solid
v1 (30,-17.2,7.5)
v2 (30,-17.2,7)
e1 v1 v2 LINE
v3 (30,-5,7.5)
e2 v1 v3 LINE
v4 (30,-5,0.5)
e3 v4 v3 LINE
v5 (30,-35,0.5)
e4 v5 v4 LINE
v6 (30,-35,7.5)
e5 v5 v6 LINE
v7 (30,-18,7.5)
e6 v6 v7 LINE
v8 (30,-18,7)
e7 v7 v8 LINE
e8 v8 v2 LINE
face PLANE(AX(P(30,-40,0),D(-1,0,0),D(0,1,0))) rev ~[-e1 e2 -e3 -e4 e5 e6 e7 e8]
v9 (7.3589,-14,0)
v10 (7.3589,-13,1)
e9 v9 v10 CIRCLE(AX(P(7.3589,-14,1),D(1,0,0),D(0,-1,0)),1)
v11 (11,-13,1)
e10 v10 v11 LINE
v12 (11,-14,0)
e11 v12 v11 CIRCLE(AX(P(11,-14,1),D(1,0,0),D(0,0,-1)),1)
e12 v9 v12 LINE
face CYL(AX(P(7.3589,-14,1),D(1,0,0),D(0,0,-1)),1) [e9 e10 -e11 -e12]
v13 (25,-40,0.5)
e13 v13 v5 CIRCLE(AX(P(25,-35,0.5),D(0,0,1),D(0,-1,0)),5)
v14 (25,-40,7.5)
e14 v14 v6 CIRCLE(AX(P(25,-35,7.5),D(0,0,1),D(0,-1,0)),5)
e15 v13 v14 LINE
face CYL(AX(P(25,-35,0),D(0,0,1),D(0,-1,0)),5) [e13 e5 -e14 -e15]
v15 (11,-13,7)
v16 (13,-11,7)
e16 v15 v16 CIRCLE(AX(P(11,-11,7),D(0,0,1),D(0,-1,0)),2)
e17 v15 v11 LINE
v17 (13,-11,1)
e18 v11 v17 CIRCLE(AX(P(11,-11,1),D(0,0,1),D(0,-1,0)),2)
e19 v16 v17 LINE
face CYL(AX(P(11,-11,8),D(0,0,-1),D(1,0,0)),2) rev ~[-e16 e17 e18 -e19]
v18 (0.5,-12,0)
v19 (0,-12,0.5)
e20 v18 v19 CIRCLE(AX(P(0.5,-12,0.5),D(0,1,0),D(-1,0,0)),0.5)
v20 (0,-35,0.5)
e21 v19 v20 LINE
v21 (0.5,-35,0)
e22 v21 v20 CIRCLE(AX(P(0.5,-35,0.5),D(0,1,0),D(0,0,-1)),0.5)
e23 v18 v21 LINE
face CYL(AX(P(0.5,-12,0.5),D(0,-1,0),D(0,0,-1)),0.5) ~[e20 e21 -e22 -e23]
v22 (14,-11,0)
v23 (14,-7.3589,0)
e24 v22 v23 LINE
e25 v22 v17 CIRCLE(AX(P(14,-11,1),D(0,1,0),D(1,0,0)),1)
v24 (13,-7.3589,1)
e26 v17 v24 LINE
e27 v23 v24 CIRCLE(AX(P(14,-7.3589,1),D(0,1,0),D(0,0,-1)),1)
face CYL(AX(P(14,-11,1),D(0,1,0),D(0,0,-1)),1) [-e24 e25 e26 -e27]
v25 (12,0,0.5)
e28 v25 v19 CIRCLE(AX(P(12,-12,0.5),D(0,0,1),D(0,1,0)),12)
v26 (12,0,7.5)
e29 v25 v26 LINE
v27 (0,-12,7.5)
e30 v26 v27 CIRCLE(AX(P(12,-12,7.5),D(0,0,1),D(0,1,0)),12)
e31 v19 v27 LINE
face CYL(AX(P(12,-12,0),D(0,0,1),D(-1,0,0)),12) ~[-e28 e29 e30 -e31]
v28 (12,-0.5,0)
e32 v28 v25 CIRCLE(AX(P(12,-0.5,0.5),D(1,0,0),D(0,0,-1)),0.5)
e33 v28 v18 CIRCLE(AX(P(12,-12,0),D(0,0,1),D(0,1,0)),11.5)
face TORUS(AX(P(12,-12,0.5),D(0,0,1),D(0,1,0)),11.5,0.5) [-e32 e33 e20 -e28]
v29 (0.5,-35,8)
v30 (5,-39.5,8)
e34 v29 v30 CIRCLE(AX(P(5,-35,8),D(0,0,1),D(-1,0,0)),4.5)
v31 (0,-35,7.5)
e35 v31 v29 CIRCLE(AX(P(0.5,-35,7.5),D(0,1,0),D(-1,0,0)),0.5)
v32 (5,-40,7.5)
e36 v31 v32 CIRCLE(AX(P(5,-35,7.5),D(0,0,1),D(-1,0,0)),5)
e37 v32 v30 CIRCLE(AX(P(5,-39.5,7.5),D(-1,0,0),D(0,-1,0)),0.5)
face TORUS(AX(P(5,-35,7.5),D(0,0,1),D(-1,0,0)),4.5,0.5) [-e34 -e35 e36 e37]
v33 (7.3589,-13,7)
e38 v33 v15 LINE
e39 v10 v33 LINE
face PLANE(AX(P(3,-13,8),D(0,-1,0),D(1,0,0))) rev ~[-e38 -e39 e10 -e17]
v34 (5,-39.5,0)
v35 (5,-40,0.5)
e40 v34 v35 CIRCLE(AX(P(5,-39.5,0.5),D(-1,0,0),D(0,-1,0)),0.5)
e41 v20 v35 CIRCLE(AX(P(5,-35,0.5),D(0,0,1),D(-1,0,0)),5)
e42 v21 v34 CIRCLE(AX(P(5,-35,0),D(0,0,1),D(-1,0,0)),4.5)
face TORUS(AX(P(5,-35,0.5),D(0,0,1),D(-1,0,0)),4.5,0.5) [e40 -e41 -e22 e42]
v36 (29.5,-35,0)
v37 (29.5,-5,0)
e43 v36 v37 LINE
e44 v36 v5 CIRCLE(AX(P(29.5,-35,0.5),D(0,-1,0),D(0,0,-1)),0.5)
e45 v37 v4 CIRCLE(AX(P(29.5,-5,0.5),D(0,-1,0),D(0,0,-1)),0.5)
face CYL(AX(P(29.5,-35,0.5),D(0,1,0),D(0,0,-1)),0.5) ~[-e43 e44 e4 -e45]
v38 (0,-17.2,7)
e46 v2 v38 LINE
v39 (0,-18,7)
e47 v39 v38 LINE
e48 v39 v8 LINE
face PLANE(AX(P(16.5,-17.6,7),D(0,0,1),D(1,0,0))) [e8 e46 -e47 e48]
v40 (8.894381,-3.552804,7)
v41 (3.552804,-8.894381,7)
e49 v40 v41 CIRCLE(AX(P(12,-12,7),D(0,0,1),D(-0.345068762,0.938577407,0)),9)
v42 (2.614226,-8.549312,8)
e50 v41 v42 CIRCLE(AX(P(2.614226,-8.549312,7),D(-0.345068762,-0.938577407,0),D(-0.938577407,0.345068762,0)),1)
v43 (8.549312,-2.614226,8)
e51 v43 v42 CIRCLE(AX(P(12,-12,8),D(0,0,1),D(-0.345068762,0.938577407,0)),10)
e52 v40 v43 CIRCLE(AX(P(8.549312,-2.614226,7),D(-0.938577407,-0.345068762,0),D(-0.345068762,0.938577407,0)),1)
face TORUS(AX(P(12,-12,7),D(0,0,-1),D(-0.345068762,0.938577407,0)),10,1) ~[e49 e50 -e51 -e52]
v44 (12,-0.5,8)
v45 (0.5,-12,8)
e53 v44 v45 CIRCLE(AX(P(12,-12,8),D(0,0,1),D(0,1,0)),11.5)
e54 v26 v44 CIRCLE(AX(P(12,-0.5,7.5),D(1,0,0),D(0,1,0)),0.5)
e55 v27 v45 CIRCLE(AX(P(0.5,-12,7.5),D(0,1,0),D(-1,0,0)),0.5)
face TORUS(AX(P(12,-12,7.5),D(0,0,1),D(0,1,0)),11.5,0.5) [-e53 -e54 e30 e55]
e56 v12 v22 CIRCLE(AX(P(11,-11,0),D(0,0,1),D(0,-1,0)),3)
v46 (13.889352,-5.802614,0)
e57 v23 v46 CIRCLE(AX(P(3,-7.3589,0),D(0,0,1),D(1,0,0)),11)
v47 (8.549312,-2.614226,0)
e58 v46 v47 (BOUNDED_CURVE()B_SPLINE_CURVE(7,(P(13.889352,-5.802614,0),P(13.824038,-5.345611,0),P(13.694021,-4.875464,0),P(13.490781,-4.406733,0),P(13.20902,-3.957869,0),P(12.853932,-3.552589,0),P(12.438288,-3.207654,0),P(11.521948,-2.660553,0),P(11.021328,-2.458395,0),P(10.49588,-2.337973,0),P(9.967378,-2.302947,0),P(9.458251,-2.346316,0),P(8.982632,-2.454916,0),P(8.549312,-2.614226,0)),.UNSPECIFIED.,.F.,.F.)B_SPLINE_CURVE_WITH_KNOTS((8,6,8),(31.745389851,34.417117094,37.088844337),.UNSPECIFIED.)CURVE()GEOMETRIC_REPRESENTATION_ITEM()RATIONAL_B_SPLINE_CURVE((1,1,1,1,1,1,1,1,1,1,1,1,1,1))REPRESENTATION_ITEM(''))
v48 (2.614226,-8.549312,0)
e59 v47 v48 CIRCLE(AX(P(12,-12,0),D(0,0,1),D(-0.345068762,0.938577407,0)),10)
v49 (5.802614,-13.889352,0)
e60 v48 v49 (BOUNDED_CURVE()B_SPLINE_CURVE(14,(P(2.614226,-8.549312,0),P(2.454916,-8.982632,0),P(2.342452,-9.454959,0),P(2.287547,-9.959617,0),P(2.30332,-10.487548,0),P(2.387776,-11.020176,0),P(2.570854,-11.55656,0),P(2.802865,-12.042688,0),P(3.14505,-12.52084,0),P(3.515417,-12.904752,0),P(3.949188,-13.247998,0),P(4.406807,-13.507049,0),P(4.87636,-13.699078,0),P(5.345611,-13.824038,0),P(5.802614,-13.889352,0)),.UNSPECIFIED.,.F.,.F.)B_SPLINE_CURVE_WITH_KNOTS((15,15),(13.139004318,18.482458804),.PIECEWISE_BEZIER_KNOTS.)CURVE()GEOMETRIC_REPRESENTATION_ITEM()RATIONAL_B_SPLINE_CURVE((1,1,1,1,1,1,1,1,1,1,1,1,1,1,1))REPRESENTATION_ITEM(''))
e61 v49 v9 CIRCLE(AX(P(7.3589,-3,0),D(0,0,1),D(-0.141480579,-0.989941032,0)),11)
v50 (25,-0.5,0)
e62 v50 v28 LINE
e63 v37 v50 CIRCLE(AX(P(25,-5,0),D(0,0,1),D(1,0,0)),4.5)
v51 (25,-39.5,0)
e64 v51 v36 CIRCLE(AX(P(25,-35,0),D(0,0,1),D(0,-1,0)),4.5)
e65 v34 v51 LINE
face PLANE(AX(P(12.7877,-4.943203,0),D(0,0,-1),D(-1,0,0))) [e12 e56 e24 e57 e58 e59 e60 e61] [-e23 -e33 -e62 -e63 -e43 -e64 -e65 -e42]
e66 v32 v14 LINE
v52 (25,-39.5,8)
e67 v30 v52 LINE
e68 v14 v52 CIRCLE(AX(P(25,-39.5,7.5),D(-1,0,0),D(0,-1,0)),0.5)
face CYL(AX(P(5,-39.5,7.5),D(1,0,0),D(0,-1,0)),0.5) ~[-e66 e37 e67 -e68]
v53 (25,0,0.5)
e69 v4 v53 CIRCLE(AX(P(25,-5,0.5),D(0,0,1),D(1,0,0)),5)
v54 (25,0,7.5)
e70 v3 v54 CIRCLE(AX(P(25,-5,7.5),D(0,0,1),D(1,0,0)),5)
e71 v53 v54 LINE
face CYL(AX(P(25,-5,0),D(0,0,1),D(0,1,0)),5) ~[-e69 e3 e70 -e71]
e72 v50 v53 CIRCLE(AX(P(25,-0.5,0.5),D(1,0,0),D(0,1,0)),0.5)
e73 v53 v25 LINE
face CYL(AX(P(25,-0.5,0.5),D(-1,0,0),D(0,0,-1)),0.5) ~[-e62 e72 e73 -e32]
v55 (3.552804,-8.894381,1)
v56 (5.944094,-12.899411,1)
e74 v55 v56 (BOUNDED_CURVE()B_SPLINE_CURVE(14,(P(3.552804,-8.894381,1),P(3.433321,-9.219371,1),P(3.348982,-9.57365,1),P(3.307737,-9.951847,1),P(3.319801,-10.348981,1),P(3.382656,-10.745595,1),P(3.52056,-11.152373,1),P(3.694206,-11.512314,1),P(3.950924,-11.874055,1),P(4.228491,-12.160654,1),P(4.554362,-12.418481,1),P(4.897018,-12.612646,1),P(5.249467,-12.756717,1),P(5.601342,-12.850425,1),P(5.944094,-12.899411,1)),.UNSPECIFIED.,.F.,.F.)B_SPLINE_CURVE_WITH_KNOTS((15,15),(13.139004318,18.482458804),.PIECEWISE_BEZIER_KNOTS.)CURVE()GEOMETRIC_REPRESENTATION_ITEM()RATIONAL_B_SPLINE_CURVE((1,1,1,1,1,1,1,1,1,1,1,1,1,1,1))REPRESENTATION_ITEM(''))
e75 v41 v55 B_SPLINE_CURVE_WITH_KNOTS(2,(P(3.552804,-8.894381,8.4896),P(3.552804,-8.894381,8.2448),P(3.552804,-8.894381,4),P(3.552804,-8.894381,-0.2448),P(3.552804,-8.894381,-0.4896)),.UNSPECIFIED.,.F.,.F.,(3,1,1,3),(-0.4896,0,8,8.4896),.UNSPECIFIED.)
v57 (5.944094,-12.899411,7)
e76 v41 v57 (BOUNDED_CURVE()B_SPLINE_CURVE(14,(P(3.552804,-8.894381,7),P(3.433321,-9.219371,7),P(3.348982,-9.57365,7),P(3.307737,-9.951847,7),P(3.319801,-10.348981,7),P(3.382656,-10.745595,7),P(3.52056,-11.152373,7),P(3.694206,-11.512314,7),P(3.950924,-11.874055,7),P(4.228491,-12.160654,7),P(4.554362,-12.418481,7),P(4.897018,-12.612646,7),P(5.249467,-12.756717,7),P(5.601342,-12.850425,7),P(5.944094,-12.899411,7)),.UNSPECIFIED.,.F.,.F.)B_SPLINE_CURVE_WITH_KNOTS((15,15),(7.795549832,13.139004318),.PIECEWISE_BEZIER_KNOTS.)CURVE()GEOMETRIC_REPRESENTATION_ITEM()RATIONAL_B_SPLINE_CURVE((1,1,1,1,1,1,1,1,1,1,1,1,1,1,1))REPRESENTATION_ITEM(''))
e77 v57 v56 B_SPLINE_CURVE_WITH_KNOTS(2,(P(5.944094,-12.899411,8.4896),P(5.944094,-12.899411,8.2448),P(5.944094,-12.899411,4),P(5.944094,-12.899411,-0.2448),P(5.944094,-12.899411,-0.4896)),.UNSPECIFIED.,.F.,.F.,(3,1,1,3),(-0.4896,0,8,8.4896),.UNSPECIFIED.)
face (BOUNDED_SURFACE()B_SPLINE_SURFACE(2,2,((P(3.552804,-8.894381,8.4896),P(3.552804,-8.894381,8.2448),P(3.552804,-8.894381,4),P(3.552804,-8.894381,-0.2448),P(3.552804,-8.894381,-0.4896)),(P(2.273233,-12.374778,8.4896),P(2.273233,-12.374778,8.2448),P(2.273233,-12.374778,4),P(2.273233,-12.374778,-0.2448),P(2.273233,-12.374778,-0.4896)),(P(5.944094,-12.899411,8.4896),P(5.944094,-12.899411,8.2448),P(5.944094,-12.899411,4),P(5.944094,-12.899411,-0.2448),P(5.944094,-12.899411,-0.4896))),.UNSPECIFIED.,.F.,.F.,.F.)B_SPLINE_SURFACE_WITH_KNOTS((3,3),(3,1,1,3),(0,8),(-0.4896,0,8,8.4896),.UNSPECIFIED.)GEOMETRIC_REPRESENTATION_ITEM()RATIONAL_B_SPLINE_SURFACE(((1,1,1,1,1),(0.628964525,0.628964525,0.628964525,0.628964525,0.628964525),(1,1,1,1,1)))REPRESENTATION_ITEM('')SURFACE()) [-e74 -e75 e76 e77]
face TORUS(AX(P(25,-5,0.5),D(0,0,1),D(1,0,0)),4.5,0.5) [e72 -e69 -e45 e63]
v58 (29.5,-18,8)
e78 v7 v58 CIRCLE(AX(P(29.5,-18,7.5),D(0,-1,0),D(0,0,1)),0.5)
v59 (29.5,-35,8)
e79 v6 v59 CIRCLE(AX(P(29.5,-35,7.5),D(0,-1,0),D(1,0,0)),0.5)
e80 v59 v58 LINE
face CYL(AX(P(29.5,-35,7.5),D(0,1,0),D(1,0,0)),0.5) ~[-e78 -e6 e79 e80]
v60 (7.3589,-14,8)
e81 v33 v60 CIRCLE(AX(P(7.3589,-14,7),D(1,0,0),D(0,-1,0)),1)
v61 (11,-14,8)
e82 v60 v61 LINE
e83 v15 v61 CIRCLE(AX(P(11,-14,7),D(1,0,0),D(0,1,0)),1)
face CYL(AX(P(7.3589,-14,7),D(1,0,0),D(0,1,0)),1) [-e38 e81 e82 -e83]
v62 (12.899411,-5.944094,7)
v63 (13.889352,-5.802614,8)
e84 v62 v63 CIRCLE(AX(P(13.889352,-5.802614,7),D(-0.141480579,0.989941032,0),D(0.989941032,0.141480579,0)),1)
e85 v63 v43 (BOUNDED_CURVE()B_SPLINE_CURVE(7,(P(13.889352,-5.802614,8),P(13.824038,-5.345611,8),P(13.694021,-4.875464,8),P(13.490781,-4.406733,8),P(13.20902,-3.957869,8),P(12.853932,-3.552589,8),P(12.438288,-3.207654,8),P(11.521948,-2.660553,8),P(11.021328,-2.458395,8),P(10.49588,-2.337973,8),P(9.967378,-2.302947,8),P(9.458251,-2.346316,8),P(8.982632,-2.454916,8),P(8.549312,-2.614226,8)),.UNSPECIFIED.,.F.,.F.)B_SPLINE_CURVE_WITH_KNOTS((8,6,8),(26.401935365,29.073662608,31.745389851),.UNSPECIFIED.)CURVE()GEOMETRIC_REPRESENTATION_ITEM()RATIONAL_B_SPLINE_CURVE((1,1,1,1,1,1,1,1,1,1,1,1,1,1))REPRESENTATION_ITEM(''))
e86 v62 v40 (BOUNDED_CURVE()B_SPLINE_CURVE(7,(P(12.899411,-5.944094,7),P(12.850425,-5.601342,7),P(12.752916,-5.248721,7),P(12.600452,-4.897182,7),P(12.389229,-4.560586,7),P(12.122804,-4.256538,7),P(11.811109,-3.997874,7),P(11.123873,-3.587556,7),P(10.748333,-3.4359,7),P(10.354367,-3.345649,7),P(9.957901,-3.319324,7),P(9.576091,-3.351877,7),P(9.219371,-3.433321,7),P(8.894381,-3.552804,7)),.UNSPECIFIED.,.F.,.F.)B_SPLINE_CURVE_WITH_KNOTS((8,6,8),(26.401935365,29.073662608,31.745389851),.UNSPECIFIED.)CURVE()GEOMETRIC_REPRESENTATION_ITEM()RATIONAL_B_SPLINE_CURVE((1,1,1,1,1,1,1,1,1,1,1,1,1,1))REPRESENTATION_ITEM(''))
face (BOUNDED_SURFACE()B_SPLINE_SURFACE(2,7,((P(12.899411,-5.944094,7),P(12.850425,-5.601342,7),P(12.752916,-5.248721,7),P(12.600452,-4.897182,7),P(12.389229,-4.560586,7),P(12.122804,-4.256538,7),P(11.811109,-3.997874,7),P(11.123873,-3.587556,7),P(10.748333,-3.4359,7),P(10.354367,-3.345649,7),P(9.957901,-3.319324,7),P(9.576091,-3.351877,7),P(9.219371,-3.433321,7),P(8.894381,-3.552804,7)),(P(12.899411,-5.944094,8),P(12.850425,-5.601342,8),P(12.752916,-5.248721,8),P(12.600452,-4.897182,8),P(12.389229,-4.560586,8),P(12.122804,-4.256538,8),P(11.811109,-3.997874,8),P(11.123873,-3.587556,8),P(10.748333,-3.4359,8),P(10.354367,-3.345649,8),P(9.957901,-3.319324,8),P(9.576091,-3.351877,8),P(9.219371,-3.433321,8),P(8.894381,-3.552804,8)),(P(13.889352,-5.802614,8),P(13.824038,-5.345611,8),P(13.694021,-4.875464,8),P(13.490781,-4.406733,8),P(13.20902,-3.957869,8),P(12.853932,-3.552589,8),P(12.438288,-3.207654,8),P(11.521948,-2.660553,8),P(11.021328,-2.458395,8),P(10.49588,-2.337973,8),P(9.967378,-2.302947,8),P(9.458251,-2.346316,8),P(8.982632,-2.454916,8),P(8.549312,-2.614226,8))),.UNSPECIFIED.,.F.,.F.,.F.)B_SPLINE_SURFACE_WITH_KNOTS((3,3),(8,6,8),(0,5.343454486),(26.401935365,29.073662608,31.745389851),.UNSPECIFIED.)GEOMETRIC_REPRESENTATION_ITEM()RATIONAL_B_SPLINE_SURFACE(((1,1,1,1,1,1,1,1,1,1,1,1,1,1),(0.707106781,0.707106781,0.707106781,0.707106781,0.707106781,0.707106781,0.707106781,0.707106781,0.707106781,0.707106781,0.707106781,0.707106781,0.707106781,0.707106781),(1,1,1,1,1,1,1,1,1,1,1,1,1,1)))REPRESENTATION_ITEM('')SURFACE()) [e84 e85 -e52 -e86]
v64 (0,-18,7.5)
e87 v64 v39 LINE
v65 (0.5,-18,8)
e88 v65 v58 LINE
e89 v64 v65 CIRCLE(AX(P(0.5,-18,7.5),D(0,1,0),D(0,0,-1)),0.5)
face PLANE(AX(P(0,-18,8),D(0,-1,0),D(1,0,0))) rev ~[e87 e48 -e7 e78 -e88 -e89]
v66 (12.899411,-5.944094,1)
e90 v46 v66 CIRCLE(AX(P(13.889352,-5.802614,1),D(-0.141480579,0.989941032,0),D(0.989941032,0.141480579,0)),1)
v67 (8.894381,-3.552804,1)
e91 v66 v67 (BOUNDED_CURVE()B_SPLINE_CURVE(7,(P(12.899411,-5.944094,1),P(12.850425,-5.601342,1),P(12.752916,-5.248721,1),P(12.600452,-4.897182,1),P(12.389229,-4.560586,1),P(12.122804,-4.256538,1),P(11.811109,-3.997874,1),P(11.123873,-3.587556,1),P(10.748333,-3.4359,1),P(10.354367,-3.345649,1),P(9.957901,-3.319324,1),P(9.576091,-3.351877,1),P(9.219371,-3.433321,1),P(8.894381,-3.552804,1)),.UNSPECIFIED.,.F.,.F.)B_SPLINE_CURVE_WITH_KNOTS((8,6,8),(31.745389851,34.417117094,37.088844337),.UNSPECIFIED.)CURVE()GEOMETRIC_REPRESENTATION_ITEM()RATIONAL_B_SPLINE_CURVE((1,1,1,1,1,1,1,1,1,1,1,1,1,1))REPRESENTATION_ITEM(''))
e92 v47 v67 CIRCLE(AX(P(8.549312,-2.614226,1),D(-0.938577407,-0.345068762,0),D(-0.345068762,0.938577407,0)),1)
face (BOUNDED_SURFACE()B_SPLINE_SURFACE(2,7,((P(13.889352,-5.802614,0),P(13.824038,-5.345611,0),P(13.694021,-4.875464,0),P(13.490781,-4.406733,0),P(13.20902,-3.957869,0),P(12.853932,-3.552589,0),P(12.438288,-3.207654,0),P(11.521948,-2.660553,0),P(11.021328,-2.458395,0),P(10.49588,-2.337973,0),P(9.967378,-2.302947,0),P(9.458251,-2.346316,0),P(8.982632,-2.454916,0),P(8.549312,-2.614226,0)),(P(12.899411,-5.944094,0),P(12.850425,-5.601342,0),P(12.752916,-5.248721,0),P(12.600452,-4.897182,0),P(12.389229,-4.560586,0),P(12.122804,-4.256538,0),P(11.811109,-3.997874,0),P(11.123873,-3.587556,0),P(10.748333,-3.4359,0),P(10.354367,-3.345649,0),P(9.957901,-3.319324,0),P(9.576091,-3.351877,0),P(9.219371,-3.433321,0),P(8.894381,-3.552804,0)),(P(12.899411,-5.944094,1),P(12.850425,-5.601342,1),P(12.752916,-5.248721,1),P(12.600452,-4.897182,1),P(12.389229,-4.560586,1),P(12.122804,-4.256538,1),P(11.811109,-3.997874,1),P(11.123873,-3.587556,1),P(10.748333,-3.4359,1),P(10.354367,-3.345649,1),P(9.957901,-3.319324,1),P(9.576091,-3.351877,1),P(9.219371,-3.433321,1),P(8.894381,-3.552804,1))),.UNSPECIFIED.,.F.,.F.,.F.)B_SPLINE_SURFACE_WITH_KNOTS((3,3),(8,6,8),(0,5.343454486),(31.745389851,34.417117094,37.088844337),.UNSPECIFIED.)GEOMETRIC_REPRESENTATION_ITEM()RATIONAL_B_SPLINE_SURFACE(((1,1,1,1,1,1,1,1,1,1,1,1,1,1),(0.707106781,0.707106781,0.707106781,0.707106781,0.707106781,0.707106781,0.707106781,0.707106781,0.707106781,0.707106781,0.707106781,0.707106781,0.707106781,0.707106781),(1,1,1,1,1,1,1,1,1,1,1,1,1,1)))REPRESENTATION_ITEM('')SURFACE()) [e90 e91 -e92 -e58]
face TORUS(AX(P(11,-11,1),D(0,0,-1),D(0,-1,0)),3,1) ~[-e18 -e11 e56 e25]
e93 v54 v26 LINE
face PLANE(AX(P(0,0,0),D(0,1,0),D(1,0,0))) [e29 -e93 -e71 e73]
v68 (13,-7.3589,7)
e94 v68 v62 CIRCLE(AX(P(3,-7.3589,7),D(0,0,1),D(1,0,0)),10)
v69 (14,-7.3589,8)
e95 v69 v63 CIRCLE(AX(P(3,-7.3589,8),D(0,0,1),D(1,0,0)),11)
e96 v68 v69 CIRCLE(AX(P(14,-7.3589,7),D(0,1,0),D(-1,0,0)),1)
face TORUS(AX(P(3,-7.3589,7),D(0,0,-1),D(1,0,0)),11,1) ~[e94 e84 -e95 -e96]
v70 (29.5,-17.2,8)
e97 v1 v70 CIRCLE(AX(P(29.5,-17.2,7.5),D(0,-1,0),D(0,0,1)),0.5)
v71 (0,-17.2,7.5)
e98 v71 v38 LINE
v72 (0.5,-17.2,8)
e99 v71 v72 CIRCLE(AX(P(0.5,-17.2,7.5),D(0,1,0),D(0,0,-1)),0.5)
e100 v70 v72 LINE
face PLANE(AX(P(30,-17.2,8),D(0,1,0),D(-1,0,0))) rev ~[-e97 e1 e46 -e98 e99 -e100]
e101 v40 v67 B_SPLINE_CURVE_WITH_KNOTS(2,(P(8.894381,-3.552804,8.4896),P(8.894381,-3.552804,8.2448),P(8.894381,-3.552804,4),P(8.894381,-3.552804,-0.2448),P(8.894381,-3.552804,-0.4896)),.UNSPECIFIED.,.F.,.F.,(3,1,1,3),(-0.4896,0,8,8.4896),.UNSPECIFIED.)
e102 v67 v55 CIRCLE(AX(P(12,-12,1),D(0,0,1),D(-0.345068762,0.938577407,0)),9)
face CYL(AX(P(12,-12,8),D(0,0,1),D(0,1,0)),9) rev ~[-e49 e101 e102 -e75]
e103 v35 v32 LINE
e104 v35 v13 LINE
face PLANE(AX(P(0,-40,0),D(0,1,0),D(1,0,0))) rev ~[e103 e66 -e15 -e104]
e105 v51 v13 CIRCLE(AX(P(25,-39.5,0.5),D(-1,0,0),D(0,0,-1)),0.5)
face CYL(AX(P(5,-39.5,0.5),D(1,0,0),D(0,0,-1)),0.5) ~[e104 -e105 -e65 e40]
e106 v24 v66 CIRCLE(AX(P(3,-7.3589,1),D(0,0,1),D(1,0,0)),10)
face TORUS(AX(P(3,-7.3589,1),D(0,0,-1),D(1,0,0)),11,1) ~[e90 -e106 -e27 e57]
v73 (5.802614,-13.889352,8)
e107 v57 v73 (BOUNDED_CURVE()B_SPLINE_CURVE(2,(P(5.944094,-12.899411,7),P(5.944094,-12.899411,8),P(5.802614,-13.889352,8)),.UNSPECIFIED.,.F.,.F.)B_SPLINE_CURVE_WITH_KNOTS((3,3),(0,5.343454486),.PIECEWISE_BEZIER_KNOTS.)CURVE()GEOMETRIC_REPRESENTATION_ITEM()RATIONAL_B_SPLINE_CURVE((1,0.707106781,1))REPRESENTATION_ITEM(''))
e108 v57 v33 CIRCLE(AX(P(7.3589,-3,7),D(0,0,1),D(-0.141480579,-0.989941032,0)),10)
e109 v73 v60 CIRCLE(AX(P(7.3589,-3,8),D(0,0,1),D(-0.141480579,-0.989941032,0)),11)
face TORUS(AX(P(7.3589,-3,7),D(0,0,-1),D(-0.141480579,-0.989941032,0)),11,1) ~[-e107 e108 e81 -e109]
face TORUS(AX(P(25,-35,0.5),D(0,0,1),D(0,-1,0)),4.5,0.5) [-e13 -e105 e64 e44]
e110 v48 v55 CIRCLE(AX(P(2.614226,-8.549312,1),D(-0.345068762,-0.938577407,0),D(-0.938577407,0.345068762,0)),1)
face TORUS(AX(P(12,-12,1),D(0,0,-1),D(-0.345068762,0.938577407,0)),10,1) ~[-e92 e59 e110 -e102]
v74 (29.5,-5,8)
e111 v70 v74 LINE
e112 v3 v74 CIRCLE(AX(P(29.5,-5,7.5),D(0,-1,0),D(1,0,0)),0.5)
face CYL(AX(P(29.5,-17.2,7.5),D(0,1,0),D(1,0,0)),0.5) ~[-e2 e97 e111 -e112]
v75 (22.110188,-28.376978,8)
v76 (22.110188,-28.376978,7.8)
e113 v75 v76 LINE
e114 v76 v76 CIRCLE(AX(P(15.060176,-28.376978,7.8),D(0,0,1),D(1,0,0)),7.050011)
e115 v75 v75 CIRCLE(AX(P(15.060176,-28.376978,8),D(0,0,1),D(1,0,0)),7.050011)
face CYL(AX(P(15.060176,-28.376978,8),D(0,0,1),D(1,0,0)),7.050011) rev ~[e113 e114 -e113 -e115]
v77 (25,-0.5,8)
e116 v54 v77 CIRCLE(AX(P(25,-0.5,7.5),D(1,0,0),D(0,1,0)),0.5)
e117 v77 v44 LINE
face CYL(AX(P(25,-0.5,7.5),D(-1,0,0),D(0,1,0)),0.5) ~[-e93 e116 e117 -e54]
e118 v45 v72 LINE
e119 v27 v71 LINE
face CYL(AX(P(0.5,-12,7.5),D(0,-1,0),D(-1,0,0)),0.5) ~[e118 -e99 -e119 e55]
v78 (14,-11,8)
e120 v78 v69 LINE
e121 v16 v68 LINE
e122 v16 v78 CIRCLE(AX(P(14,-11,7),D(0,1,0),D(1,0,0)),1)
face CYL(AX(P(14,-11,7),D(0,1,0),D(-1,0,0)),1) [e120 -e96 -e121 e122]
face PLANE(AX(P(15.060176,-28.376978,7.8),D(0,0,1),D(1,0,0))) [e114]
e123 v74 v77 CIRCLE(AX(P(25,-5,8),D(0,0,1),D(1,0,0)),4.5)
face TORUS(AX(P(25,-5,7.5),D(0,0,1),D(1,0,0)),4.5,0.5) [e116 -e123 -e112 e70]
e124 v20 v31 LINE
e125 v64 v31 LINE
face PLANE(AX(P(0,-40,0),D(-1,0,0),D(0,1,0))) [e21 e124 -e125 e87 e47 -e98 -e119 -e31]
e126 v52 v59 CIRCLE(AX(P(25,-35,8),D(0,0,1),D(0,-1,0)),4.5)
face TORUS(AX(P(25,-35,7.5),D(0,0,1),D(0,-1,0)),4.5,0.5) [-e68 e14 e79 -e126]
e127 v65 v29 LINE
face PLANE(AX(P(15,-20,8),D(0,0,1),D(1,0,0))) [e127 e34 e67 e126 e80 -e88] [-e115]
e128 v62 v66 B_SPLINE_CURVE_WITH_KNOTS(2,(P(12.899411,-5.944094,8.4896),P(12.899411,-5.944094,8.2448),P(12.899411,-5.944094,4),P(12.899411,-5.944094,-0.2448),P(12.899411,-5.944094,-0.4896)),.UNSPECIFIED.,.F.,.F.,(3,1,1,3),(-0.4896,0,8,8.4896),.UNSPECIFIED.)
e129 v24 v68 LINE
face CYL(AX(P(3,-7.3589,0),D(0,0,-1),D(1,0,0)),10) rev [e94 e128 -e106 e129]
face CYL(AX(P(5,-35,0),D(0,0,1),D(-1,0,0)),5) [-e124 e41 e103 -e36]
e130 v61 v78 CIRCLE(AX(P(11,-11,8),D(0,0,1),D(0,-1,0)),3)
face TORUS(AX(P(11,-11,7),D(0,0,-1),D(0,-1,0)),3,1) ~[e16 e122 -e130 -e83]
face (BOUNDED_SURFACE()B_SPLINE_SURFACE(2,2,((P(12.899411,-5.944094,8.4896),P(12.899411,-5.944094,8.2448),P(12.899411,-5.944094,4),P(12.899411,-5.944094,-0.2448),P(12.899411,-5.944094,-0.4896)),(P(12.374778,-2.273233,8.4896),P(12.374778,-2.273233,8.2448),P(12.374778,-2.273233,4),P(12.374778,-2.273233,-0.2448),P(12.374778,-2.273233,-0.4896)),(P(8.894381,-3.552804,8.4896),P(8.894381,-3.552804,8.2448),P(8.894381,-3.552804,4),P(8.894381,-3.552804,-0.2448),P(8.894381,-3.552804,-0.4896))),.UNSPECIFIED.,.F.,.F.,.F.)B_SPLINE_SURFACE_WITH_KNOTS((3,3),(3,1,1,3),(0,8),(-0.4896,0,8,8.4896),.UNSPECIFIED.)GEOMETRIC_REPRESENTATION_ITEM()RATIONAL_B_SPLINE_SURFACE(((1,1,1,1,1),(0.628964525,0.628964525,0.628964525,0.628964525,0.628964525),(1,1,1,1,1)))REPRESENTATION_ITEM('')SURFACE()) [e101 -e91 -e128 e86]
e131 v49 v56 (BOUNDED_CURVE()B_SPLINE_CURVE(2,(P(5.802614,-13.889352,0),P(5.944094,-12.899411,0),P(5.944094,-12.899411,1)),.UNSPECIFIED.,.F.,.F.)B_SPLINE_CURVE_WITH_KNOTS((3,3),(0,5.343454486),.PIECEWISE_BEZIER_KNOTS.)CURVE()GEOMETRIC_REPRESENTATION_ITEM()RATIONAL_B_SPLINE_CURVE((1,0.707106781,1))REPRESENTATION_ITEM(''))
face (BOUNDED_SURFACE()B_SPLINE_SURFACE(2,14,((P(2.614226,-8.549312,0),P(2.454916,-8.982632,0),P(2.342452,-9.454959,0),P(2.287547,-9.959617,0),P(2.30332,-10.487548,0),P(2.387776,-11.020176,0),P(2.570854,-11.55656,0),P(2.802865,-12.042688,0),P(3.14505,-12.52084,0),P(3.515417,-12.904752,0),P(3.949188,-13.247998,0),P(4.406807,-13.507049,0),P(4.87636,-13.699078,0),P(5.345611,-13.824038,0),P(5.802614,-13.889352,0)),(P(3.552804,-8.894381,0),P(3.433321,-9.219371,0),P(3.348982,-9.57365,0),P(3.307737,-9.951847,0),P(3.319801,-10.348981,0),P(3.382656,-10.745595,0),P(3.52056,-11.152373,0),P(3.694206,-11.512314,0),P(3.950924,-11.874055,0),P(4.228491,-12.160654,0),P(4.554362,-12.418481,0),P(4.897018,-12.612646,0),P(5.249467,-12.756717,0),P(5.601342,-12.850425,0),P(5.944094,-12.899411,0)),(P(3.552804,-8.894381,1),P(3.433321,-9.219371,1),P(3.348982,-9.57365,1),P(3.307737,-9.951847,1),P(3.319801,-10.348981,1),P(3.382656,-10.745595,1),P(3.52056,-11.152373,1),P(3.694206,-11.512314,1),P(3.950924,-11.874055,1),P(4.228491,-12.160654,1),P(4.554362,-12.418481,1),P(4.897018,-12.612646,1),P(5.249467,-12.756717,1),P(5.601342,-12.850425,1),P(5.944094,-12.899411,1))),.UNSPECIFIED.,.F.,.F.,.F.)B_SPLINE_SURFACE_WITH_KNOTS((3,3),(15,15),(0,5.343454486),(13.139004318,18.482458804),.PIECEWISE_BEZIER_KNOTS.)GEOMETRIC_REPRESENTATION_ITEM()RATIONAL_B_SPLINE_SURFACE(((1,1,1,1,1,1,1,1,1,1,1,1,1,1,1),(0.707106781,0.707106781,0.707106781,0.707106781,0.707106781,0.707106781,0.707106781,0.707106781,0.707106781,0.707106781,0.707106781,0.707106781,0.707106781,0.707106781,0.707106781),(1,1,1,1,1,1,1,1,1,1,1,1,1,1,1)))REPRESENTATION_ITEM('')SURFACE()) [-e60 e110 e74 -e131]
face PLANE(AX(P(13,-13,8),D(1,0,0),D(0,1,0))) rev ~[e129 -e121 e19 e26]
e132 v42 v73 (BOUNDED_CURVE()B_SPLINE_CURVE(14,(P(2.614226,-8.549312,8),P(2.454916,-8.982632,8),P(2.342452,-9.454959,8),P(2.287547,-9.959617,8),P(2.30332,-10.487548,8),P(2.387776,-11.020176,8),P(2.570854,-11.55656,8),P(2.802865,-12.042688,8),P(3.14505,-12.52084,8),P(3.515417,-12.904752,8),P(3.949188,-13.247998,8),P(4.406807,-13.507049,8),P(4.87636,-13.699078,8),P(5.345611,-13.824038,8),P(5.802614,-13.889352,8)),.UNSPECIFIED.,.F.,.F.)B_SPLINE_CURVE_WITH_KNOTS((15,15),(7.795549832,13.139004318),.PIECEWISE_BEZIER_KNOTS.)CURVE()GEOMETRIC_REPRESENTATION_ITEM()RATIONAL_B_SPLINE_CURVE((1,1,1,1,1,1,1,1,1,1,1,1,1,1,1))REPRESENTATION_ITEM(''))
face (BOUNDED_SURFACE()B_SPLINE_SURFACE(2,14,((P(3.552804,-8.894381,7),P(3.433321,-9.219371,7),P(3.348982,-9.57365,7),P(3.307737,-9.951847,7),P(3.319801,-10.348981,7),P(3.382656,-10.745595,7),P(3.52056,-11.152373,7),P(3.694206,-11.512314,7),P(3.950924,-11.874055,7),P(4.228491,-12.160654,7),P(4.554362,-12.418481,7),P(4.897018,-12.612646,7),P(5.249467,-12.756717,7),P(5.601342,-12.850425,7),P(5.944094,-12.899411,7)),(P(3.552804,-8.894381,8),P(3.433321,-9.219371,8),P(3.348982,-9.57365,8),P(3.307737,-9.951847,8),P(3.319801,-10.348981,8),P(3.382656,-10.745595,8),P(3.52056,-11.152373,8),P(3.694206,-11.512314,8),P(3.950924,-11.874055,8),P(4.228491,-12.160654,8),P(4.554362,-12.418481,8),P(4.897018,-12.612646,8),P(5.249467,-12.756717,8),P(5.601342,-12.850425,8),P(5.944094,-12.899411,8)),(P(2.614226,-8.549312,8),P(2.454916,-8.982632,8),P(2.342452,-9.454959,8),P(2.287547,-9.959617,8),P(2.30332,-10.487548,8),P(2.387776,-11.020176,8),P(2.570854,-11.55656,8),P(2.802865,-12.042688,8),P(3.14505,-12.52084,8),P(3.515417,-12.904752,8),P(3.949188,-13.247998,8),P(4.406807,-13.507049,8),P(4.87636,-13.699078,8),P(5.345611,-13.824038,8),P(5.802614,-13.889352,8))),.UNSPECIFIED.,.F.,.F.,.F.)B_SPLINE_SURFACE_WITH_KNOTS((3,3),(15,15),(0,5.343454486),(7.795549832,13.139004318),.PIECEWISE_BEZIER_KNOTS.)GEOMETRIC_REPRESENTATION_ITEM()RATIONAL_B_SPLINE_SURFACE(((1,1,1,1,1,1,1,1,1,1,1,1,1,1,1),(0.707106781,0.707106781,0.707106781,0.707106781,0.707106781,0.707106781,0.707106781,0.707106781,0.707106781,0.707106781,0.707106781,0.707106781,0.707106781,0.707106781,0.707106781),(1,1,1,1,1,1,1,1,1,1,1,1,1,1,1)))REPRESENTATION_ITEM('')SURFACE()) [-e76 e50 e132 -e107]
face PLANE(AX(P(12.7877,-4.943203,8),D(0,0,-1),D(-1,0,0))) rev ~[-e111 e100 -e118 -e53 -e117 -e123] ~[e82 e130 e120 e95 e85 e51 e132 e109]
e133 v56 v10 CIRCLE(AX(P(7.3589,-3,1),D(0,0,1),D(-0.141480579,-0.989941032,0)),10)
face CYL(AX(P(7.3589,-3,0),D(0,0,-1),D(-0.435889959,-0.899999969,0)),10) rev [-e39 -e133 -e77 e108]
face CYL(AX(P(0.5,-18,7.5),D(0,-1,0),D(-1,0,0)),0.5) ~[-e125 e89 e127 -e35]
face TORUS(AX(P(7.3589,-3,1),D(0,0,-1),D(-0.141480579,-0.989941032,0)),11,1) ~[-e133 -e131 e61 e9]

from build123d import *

# Parameters (mm, degrees)
F0_W        = 30
F0_H        = 40
F1_DEPTH    = 8
F2_R        = 12
F3_R        = 5
F5_DEPTH    = 25
F4_W        = 26.9999996879
F4_H        = 0.8
F4_W_2      = 3.0000003121
F6_DEPTH    = 1
F7_T1_DEPTH = 8
F8_R        = 3
F9_R        = 2
F10_R       = 0.5
F11_R       = 1
F12_R       = 7.0500114294
F13_DEPTH   = 0.2


# Not quite as in the source:
# - a fillet or chamfer that OpenCascade refuses, or shapes differently, is made with other operations: its cross-section is extruded or revolved along the edge and cut away or added


with BuildPart() as f1:
    # F0 (on Top) → F1 (new body)
    with BuildSketch(Plane.XY):
        with Locations((15, -20)):
            Rectangle(F0_W, F0_H)
    extrude(amount=F1_DEPTH)

    # F2
    f2_edges = [f1.edges().sort_by_distance(p)[0] for p in [
        (0, 0, 4),
    ]]
    fillet(f2_edges, radius=F2_R)

    # F3
    f3_edges = [f1.edges().sort_by_distance(p)[0] for p in [
        (30, 0, 4),
        (30, -40, 4),
        (0, -40, 4),
    ]]
    fillet(f3_edges, radius=F3_R)

    # F4 (on face) → F5 (cut)
    with BuildSketch(Plane.XY.offset(8)):
        with BuildLine():
            Line((3.0000003121, -12), (3.0000003121, -13.0000003121))
            Line((3.0000003121, -13.0000003121), (13.0000003121, -13.0000003121))
            Line((13.0000003121, -13.0000003121), (13.0000003121, -3.0000003121))
            Line((13.0000003121, -3.0000003121), (12, -3.0000003121))
            ThreePointArc((12, -3.0000003121), (5.63603919, -5.63603919), (3.0000003121, -12))
        make_face()
    extrude(amount=-F5_DEPTH, mode=Mode.SUBTRACT)

    # F4 (on face) → F6 (cut)
    with BuildSketch(Plane.XY.offset(8)):
        with Locations((16.500000156, -17.6)):
            Rectangle(F4_W, F4_H)
        with Locations((1.500000156, -17.6)):
            Rectangle(F4_W_2, F4_H)
    extrude(amount=-F6_DEPTH, mode=Mode.SUBTRACT)

    # F7: fillet of radius 10 on 2 edges, made by hand

    # F7_s2 → F7_t1 (join)
    with BuildSketch(Plane.XY):
        with BuildLine():
            ThreePointArc((13.0000003121, -7.3588999), (12.7467945768, -5.1228315736), (12, -3.0000003121))
            Line((12, -3.0000003121), (13.0000003121, -3.0000003121))
            Line((13.0000003121, -3.0000003121), (13.0000003121, -7.3588999))
        make_face()
        with BuildLine():
            ThreePointArc((3.0000003121, -12), (5.1228315736, -12.7467945768), (7.3588999, -13.0000003121))
            Line((7.3588999, -13.0000003121), (3.0000003121, -13.0000003121))
            Line((3.0000003121, -13.0000003121), (3.0000003121, -12))
        make_face()
    extrude(amount=F7_T1_DEPTH)

    # F8
    f8_edges = [f1.edges().sort_by_distance(p)[0] for p in [
        (12, -3, 4),
        (3, -12, 4),
    ]]
    fillet(f8_edges, radius=F8_R)

    # F9
    f9_edges = [f1.edges().sort_by_distance(p)[0] for p in [
        (13, -13, 4),
    ]]
    fillet(f9_edges, radius=F9_R)

    # F10
    f10_edges = [f1.edges().sort_by_distance(p)[0] for p in [
        (30, -11.1, 8),
        (30, -26.5, 8),
        (30, -20, 0),
        (18.5, 0, 0),
        (3.514719, -3.514719, 0),
        (0, -23.5, 0),
        (1.464466, -38.535534, 0),
        (15, -40, 0),
        (28.535534, -38.535534, 0),
        (28.535534, -1.464466, 0),
        (18.5, 0, 8),
        (3.514719, -3.514719, 8),
        (0, -26.5, 8),
        (0, -14.6, 8),
        (1.464466, -38.535534, 8),
        (15, -40, 8),
        (28.535534, -38.535534, 8),
        (28.535534, -1.464466, 8),
    ]]
    fillet(f10_edges, radius=F10_R)

    # F11
    f11_edges = [f1.edges().sort_by_distance(p)[0] for p in [
        (5.636039, -5.636039, 8),
        (11.467525, -3.792736, 0),
        (9.17945, -13, 0),
        (12.414214, -12.414214, 0),
        (6.649711, -12.974821, 0),
        (13, -9.17945, 0),
        (3.792736, -11.467525, 0),
        (12.974821, -6.649711, 0),
        (5.636039, -5.636039, 0),
        (9.17945, -13, 8),
        (12.414214, -12.414214, 8),
        (6.649711, -12.974821, 8),
        (13, -9.17945, 8),
        (3.792736, -11.467525, 8),
        (12.974821, -6.649711, 8),
        (11.467525, -3.792736, 8),
    ]]
    fillet(f11_edges, radius=F11_R)

    # F12 (on face) → F13 (cut)
    with BuildSketch(Plane.XY.offset(8)):
        with Locations((15.0601761416, -28.3769778907)):
            Circle(F12_R)
    extrude(amount=-F13_DEPTH, mode=Mode.SUBTRACT)


solid = f1.part
